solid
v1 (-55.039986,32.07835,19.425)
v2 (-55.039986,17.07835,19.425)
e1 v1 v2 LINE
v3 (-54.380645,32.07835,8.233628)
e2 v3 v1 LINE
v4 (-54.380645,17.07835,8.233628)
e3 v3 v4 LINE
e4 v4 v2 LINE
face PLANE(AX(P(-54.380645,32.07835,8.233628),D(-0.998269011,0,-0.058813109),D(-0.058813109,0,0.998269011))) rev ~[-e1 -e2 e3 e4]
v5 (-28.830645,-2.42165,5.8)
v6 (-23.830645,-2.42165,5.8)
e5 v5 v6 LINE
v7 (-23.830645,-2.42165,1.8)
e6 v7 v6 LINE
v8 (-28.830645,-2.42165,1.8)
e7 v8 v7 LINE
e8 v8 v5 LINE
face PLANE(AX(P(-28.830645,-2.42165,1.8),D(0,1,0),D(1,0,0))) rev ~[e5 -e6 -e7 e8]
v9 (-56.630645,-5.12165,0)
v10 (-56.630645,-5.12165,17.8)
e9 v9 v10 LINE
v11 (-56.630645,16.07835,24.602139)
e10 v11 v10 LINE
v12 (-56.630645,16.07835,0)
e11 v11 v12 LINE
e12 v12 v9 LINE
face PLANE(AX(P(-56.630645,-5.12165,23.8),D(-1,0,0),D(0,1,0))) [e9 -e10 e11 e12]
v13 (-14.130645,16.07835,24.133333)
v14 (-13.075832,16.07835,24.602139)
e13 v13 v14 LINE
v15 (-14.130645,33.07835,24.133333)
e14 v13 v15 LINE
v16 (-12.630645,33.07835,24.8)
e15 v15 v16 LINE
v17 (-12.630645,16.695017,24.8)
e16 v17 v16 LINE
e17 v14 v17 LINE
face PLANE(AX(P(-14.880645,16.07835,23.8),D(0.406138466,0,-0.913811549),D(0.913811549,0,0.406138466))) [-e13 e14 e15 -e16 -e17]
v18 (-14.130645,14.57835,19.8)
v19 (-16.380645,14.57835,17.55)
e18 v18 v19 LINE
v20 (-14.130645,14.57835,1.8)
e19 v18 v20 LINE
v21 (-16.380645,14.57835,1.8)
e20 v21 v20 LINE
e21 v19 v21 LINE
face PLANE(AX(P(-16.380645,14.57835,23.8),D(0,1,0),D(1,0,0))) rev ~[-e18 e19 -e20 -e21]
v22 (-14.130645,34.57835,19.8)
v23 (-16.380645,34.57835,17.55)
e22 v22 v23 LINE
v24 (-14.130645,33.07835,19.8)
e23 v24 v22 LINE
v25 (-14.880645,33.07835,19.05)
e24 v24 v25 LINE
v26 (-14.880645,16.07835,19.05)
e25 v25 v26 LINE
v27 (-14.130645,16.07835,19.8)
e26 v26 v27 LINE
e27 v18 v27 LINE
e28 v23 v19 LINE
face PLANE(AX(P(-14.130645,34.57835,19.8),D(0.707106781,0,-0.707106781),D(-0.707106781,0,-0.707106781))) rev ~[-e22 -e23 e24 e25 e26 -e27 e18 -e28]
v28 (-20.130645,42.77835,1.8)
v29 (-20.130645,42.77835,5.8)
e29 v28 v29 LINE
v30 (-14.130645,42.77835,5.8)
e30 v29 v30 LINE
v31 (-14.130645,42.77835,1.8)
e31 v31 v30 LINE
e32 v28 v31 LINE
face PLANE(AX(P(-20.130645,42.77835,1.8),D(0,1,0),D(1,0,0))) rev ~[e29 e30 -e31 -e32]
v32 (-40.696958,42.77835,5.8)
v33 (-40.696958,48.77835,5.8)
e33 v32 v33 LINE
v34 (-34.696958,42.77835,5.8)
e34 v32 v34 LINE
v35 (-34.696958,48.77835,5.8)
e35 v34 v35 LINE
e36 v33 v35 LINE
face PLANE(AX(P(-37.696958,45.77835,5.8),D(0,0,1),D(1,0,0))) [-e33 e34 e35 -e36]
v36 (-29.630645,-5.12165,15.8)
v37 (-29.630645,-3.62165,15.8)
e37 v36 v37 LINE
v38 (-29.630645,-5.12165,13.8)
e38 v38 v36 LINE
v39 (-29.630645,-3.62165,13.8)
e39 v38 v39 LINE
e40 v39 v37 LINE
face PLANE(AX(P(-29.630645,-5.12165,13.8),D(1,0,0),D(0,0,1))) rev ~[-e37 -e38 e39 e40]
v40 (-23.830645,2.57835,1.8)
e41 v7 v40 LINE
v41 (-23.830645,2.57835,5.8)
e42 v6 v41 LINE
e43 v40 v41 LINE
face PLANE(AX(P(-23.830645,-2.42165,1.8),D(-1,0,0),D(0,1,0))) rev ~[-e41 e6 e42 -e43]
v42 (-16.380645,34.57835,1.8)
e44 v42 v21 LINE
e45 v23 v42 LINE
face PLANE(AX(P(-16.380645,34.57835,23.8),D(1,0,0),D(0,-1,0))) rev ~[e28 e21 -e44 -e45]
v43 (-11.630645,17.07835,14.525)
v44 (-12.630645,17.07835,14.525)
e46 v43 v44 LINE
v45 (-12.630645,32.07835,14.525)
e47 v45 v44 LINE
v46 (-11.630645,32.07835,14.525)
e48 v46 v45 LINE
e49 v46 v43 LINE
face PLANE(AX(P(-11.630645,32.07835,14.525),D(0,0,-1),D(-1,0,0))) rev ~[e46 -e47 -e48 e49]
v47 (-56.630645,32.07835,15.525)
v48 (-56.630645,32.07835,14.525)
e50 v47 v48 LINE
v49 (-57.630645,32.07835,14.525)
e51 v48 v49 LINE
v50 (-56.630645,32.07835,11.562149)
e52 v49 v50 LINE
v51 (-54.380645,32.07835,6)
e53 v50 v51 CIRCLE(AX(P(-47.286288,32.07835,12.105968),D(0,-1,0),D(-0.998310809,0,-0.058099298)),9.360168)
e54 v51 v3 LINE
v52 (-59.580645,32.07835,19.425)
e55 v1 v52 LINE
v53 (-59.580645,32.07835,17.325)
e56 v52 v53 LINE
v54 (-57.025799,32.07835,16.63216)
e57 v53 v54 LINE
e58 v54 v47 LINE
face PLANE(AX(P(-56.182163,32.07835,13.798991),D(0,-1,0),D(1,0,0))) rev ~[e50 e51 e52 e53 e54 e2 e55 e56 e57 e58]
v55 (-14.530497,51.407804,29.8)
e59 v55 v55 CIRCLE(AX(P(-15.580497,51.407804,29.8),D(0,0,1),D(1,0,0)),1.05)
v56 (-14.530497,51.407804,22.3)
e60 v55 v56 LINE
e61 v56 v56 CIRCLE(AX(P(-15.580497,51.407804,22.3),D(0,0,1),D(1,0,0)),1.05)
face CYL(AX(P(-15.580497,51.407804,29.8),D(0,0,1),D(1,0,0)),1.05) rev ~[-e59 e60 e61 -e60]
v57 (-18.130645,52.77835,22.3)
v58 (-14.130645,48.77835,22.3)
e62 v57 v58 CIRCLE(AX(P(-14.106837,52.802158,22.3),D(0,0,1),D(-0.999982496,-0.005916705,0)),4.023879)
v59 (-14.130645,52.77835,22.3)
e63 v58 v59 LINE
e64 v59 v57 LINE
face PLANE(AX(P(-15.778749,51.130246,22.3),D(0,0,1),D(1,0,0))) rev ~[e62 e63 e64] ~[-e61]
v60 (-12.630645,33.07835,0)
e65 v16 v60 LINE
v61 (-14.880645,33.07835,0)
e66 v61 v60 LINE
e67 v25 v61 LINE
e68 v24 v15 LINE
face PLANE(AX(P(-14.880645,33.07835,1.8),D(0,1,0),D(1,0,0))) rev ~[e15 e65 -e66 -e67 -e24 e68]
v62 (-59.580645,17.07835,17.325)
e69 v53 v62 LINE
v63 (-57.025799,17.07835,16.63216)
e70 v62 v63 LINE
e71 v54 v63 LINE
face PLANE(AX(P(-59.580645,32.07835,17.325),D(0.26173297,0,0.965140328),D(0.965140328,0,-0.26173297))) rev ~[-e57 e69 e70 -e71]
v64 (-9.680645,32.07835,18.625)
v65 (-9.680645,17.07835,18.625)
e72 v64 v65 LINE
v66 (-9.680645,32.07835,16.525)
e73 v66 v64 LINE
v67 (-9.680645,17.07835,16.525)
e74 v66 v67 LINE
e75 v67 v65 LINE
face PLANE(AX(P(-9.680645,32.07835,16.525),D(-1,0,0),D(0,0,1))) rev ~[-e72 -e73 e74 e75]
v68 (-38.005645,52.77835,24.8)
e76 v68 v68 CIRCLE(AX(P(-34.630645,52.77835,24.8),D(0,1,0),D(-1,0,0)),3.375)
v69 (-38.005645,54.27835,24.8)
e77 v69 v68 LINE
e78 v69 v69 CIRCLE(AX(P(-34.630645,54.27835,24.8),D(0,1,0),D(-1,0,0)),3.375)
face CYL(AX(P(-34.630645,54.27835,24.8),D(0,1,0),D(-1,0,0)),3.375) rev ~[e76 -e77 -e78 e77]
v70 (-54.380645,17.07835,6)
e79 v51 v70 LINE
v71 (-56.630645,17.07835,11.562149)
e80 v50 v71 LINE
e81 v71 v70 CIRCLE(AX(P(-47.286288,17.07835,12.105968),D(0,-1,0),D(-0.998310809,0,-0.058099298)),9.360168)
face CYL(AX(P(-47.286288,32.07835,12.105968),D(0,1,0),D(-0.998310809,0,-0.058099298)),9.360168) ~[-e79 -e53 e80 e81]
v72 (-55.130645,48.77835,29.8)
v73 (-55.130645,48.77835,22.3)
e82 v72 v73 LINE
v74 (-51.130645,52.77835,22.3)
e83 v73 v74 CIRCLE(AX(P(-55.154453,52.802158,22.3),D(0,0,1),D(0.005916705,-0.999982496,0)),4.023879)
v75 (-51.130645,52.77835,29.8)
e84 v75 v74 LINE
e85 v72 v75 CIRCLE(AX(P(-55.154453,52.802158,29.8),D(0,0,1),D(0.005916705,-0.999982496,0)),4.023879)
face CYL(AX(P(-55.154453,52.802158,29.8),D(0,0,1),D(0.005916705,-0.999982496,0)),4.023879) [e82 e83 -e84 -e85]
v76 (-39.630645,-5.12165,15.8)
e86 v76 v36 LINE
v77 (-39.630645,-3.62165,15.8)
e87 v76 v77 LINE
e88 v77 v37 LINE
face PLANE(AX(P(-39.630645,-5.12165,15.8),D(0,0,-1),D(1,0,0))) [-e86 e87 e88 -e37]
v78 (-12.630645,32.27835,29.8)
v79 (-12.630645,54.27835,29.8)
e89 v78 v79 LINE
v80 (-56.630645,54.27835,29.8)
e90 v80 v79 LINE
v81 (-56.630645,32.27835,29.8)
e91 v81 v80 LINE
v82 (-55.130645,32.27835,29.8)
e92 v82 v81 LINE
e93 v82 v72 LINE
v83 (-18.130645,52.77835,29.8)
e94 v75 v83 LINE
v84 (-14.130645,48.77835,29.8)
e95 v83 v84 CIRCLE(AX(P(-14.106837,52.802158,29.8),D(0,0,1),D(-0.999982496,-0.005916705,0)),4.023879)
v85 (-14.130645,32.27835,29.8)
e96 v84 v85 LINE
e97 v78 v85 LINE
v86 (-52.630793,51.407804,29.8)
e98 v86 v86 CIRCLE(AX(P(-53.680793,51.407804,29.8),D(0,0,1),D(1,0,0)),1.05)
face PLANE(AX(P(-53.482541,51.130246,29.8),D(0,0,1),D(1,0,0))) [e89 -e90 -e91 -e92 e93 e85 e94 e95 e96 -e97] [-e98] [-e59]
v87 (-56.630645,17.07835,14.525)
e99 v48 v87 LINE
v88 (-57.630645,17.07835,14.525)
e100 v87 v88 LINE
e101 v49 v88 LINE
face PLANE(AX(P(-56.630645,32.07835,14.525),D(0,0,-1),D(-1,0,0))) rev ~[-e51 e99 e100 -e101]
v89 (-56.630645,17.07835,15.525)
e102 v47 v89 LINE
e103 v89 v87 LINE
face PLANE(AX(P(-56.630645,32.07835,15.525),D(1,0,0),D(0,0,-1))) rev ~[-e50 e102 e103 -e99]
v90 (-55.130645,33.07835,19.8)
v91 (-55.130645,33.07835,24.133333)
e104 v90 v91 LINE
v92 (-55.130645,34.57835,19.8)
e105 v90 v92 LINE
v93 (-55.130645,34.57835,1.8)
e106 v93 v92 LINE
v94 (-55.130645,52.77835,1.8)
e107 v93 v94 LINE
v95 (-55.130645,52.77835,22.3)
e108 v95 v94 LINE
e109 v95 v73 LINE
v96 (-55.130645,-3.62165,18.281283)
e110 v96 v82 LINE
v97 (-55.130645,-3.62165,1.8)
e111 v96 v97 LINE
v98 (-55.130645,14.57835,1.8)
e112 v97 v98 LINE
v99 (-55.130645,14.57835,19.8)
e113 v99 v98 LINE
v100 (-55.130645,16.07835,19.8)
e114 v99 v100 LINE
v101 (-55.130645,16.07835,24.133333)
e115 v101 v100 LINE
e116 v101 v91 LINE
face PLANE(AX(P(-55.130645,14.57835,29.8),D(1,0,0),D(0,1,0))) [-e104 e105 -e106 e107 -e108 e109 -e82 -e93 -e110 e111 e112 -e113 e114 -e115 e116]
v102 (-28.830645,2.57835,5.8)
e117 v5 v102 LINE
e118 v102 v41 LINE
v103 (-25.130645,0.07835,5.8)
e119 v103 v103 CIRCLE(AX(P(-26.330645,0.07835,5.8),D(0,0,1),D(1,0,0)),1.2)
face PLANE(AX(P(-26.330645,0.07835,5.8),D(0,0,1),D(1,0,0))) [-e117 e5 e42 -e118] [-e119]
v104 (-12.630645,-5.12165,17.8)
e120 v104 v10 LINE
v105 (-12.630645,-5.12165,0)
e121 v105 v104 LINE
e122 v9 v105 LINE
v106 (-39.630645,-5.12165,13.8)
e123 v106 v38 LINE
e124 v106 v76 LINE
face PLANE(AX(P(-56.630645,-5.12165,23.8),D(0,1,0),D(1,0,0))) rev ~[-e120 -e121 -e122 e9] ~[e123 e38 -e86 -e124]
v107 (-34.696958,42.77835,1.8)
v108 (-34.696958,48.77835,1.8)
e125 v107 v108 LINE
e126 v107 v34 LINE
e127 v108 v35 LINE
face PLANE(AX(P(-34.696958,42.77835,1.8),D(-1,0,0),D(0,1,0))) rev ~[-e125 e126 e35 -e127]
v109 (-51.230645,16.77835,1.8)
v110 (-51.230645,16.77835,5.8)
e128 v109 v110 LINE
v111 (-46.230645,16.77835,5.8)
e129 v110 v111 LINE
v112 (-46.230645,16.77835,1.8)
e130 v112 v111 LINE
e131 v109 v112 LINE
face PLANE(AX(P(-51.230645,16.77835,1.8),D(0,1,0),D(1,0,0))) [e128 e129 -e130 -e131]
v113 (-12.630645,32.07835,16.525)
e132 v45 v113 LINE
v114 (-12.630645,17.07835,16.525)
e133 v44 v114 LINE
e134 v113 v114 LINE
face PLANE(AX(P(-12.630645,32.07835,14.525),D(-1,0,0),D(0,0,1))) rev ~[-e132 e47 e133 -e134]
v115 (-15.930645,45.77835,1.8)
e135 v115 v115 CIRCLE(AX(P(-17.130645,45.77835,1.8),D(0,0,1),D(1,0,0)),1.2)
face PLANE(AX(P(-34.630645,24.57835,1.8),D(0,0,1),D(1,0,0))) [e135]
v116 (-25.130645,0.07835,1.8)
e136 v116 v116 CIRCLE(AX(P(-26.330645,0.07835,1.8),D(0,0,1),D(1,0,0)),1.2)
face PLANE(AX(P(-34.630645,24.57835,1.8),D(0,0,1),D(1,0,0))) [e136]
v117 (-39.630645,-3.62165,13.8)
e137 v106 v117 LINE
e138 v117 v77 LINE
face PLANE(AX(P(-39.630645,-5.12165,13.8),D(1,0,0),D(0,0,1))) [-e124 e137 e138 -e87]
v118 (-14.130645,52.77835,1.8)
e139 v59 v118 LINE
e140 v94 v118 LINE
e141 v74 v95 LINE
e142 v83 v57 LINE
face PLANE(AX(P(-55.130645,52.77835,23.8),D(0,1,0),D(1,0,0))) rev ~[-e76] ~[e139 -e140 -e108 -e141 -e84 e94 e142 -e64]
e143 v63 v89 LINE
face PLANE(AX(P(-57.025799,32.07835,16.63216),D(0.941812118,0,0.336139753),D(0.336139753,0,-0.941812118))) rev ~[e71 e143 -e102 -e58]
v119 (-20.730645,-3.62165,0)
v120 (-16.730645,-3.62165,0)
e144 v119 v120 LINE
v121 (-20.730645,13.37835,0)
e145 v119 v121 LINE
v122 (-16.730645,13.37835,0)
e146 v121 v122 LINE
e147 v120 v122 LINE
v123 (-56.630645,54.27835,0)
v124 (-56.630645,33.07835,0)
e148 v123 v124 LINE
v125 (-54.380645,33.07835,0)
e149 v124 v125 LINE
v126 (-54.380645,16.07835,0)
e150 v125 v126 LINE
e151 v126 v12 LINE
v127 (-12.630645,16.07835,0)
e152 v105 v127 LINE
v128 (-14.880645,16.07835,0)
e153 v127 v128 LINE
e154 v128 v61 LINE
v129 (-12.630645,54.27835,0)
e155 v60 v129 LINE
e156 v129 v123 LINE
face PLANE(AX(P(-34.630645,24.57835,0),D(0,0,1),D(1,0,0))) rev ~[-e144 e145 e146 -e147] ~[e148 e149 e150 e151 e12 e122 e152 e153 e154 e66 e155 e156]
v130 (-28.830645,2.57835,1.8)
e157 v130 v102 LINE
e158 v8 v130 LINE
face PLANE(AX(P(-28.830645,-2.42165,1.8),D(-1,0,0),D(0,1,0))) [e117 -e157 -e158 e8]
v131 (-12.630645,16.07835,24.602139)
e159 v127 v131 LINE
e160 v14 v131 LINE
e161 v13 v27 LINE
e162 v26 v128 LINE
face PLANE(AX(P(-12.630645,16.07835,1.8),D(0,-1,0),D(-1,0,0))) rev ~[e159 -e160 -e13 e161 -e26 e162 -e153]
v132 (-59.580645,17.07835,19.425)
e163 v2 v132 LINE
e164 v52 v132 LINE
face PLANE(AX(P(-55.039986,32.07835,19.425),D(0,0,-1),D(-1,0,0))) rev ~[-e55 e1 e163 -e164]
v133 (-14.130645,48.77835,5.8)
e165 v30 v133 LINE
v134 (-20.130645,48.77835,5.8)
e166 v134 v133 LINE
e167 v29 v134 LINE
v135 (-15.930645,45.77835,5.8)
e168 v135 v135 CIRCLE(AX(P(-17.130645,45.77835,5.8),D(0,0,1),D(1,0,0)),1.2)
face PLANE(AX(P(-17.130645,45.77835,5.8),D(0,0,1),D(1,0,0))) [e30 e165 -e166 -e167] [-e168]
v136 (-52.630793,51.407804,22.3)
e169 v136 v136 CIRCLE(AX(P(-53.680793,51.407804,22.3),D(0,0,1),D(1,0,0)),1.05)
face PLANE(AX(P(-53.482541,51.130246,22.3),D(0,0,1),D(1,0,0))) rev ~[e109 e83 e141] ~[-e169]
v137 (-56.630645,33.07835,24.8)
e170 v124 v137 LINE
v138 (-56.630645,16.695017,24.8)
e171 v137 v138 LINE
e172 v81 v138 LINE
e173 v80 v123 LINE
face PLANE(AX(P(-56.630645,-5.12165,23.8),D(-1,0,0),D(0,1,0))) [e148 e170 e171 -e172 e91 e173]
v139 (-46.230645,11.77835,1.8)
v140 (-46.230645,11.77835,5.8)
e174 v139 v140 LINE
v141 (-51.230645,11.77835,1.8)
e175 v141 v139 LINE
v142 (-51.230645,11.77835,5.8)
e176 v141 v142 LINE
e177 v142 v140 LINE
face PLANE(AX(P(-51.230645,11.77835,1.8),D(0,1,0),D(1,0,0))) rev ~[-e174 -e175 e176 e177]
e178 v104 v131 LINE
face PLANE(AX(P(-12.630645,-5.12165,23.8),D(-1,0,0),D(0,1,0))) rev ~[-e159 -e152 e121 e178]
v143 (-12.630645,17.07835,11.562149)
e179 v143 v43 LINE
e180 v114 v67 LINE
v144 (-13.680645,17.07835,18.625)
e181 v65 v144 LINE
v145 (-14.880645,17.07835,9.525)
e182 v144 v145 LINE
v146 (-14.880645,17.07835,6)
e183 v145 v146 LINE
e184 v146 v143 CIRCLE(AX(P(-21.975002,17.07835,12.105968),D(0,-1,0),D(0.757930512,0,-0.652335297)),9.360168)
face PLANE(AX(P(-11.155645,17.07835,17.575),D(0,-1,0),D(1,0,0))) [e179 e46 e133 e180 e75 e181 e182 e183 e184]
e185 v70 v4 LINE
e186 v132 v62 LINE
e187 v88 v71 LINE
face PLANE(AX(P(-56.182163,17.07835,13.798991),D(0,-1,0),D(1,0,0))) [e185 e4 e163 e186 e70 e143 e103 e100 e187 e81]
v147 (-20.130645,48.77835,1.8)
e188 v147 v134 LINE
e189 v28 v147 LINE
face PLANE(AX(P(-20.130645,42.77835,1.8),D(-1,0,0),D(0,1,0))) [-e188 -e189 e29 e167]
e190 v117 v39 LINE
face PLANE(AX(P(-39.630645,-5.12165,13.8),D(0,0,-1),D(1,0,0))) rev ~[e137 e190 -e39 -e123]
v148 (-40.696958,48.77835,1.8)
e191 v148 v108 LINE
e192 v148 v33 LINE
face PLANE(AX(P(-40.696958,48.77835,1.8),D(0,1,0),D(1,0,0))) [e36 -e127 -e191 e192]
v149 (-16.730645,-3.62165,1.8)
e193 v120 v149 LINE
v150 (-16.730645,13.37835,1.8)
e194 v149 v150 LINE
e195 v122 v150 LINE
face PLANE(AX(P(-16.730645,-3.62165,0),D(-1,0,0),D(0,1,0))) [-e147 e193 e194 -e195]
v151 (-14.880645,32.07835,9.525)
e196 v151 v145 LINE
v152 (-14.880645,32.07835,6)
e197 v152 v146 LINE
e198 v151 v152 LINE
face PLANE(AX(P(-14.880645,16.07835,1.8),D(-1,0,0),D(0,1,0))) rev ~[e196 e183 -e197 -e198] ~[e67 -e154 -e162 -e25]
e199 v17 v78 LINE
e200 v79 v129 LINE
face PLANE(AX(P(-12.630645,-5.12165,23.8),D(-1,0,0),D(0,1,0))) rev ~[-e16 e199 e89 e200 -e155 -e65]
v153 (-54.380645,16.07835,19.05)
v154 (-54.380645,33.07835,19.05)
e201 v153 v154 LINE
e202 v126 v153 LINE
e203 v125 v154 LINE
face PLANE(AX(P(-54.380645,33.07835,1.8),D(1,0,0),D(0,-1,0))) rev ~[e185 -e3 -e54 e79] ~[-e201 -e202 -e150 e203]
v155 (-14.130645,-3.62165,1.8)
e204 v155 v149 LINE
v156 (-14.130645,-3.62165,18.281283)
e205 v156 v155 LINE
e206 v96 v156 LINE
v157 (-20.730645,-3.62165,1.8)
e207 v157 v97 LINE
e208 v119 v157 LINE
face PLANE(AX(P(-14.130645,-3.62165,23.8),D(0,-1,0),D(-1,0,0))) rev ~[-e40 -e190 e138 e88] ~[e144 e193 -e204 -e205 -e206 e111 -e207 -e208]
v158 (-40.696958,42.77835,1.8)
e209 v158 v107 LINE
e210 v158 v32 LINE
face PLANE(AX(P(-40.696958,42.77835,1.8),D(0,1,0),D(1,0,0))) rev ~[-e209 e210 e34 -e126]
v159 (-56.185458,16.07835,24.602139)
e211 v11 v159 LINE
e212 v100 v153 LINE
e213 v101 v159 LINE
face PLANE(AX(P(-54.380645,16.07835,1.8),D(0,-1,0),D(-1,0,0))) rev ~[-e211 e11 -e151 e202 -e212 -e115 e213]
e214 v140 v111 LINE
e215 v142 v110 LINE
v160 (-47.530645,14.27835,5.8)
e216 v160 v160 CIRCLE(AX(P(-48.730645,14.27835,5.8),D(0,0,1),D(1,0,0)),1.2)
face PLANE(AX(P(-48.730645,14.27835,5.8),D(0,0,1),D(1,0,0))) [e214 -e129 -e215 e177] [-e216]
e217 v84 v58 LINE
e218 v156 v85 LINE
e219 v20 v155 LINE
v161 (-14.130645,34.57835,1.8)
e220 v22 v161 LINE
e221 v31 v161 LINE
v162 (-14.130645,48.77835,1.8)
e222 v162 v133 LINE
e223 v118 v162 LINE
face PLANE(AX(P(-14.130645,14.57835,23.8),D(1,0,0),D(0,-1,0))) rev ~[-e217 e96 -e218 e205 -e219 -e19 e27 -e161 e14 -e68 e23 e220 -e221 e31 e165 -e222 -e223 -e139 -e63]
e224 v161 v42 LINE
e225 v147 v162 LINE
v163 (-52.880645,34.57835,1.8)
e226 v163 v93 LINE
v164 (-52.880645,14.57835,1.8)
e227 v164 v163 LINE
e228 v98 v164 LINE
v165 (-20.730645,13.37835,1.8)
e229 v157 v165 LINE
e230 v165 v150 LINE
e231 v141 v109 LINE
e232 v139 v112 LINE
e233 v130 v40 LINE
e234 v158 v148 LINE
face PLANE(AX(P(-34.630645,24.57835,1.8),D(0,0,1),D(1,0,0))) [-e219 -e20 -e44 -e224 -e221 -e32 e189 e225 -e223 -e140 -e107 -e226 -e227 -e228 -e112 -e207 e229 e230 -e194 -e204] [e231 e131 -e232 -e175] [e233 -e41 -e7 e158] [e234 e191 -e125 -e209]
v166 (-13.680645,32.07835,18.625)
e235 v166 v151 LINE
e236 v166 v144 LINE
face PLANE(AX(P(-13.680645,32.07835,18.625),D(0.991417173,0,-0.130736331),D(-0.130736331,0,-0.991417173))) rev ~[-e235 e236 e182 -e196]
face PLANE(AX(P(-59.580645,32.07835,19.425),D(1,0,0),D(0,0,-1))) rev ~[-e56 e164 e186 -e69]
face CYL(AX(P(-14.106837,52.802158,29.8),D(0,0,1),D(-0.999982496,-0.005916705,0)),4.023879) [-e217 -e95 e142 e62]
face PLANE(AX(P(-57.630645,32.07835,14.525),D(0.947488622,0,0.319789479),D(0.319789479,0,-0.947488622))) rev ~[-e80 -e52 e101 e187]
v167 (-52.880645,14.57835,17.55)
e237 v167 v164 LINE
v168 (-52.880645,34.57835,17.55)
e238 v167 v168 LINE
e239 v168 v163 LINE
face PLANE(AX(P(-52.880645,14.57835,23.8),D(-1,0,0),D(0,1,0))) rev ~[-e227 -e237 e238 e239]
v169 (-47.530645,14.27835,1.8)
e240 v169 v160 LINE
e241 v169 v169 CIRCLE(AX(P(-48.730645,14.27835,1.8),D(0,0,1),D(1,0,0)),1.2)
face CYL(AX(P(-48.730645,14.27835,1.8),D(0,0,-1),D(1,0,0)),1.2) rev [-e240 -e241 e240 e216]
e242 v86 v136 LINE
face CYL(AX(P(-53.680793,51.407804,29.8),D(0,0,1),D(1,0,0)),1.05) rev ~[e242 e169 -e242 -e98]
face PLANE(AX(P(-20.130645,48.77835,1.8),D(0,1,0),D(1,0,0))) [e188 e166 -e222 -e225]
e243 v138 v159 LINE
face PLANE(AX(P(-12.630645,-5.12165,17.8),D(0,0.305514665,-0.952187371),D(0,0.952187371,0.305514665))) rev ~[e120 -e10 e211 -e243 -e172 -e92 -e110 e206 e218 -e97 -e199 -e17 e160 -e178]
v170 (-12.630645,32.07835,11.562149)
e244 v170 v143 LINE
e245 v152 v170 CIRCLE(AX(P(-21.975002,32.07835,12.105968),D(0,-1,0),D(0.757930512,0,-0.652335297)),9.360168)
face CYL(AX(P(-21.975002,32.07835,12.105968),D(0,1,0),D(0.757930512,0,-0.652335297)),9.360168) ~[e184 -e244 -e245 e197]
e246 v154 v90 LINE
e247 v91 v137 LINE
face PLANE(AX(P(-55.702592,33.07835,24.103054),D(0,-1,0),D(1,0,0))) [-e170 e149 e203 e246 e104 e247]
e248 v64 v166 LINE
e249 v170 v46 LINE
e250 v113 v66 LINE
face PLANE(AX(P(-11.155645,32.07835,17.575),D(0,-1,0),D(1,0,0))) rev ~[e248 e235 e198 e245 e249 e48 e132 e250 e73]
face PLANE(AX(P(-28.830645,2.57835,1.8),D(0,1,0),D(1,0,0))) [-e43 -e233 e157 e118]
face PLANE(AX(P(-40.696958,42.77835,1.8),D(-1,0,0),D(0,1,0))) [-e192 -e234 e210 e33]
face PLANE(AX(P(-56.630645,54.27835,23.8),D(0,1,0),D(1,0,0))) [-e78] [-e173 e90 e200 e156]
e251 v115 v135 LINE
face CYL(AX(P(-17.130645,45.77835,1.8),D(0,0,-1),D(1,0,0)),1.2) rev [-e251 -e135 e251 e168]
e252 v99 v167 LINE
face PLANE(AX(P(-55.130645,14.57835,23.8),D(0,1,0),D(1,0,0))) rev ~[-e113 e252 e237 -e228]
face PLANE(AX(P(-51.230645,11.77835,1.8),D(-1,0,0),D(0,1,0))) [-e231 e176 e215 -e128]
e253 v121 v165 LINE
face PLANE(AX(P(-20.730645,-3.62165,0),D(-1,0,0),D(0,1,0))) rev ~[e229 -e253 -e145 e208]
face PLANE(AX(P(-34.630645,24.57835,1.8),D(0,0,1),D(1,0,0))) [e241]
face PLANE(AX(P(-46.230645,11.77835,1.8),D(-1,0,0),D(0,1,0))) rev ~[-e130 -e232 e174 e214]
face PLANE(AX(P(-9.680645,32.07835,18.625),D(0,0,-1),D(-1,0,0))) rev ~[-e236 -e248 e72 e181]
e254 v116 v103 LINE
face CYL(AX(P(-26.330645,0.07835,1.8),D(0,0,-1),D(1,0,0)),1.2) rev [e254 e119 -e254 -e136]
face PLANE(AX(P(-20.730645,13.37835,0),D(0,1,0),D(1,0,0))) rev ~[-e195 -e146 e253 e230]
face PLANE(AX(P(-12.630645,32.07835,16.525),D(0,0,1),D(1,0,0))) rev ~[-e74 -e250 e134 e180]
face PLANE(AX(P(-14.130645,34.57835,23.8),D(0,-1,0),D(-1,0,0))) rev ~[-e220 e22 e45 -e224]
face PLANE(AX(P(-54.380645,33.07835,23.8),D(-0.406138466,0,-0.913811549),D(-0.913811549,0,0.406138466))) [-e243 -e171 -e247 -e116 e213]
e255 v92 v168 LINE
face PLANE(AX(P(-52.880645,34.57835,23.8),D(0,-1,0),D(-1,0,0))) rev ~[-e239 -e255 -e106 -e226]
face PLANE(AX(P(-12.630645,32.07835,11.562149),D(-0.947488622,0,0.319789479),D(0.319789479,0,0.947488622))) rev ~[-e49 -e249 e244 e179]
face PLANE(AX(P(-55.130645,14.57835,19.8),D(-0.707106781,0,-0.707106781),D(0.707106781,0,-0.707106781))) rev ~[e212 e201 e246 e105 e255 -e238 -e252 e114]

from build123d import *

# Parameters (mm, degrees)
F0_W      = 4
F0_H      = 17
F1_DEPTH  = 1.8
F3_DEPTH  = 22
F4_W      = 44
F4_H      = 59.4
F5_DEPTH  = 6
F6_W      = 2.25
F6_H      = 20
F7_DEPTH  = 10
F9_DEPTH  = 20
F11_DEPTH = 17
F13_DEPTH = 20
F15_DEPTH = 17
F17_DEPTH = 45
F18_R     = 3.375
F19_DEPTH = 3
F20_R     = 1.05
F21_DEPTH = 7.5
F22_W     = 10
F22_H     = 2
F23_DEPTH = 2.5
F25_START = 1
F24_W     = 2.95
F24_H     = 2.1
F25_DEPTH = 15
F26_W     = 5
F26_H     = 5
F26_R     = 1.2
F26_W_2   = 6
F26_H_2   = 6
F27_DEPTH = 4


# Not quite as in the source:
# - a feature names something its author has since deleted; it is built from what else it names


with BuildPart() as f1:
    # F0 (on Top) → F1 (new body)
    with BuildSketch(Plane.XY):
        Polygon((-12.630645159, 54.2783500865), (-56.630645159, 54.2783500865), (-56.630645159, 33.0783500865), (-54.380645159, 33.0783500865), (-54.380645159, 16.0783500865), (-56.630645159, 16.0783500865), (-56.630645159, -5.1216499135), (-12.630645159, -5.1216499135), (-12.630645159, 16.0783500865), (-14.880645159, 16.0783500865), (-14.880645159, 33.0783500865), (-12.630645159, 33.0783500865), align=None)
        with Locations((-18.730645159, 4.8783500865)):
            Rectangle(F0_W, F0_H, mode=Mode.SUBTRACT)
    extrude(amount=F1_DEPTH)

    # F2 (on face) → F3 (join)
    with BuildSketch(Plane.XY.offset(1.8)):
        Polygon((-12.630645159, 33.0783500865), (-12.630645159, 54.2783500865), (-56.630645159, 54.2783500865), (-56.630645159, 33.0783500865), (-54.380645159, 33.0783500865), (-54.380645159, 16.0783500865), (-56.630645159, 16.0783500865), (-56.630645159, -5.1216499135), (-12.630645159, -5.1216499135), (-12.630645159, 16.0783500865), (-14.880645159, 16.0783500865), (-14.880645159, 33.0783500865), align=None)
        Polygon((-55.130645159, 34.5783500865), (-55.130645159, 52.7783500865), (-14.130645159, 52.7783500865), (-14.130645159, 34.5783500865), (-16.380645159, 34.5783500865), (-16.380645159, 14.5783500865), (-14.130645159, 14.5783500865), (-14.130645159, -3.6216499135), (-16.730645159, -3.6216499135), (-20.730645159, -3.6216499135), (-55.130645159, -3.6216499135), (-55.130645159, 14.5783500865), (-52.880645159, 14.5783500865), (-52.880645159, 34.5783500865), align=None, mode=Mode.SUBTRACT)
    extrude(amount=F3_DEPTH)

    # F4 (on face) → F5 (join)
    with BuildSketch(Plane.XY.offset(23.8)):
        with Locations((-34.630645159, 24.5783500865)):
            Rectangle(F4_W, F4_H)
        Polygon((-55.130645159, 34.5783500865), (-55.130645159, 52.7783500865), (-14.130645159, 52.7783500865), (-14.130645159, 34.5783500865), (-16.380645159, 34.5783500865), (-16.380645159, 14.5783500865), (-14.130645159, 14.5783500865), (-14.130645159, -3.6216499135), (-55.130645159, -3.6216499135), (-55.130645159, 14.5783500865), (-52.880645159, 14.5783500865), (-52.880645159, 34.5783500865), align=None, mode=Mode.SUBTRACT)
    extrude(amount=F5_DEPTH)

    # F6 (on face) → F7 (cut)
    with BuildSketch(Plane.XY.offset(29.8)):
        with Locations((-54.005645159, 24.5783500865)):
            Rectangle(F6_W, F6_H)
        with Locations((-15.255645159, 24.5783500865)):
            Rectangle(F6_W, F6_H)
    extrude(amount=-F7_DEPTH, mode=Mode.SUBTRACT)

    # F8 (on face) → F9 (cut)
    with BuildSketch(Plane.XZ.offset(-14.5783500865)):
        Polygon((-52.880645159, 19.8), (-55.130645159, 19.8), (-52.880645159, 17.55), align=None)
    extrude(amount=-F9_DEPTH, mode=Mode.SUBTRACT)

    # F10 (on face) → F11 (cut)
    with BuildSketch(Plane.XZ.offset(-33.0783500865)):
        Polygon((-56.630645159, 24.8), (-56.630645159, 23.8), (-55.880645159, 23.8), (-54.380645159, 23.8), align=None)
    extrude(amount=F11_DEPTH, mode=Mode.SUBTRACT)

    # F12 (on face) → F13 (cut)
    with BuildSketch(Plane(origin=(0, 34.5783500865, 0), x_dir=(-1, 0, 0), z_dir=(0, 1, 0))):
        Polygon((16.380645159, 17.55), (16.380645159, 19.8), (14.130645159, 19.8), align=None)
    extrude(amount=-F13_DEPTH, mode=Mode.SUBTRACT)

    # F14 (on face) → F15 (cut)
    with BuildSketch(Plane(origin=(0, 16.0783500865, 0), x_dir=(-1, 0, 0), z_dir=(0, 1, 0))):
        Polygon((12.630645159, 24.8), (12.630645159, 23.8), (14.880645159, 23.8), align=None)
    extrude(amount=F15_DEPTH, mode=Mode.SUBTRACT)

    # F16 (on face) → F17 (cut)
    with BuildSketch(Plane.YZ.offset(-12.630645159)):
        Polygon((32.2783500865, 29.8), (-5.1216499135, 29.8), (-5.1216499135, 17.8), align=None)
    extrude(amount=-F17_DEPTH, mode=Mode.SUBTRACT)

    # F18 (on face) → F19 (cut)
    with BuildSketch(Plane(origin=(0, 54.2783500865, 0), x_dir=(-1, 0, 0), z_dir=(0, 1, 0))):
        with Locations((34.630645159, 24.8)):
            Circle(F18_R)
    extrude(amount=-F19_DEPTH, mode=Mode.SUBTRACT)

    # F20 (on face) → F21 (join)
    with BuildSketch(Plane.XY.offset(29.8)):
        with BuildLine():
            Line((-55.130645159, 52.7783500865), (-55.130645159, 48.7783500865))
            ThreePointArc((-55.130645159, 48.7783500865), (-52.3091414621, 49.9568463896), (-51.130645159, 52.7783500865))
            Line((-51.130645159, 52.7783500865), (-55.130645159, 52.7783500865))
        make_face()
        with Locations((-53.6807930499, 51.4078039413)):
            Circle(F20_R, mode=Mode.SUBTRACT)
        with BuildLine():
            Line((-14.130645159, 52.7783500865), (-18.130645159, 52.7783500865))
            ThreePointArc((-18.130645159, 52.7783500865), (-16.952148856, 49.9568463896), (-14.130645159, 48.7783500865))
            Line((-14.130645159, 48.7783500865), (-14.130645159, 52.7783500865))
        make_face()
        with Locations((-15.5804972681, 51.4078039413)):
            Circle(F20_R, mode=Mode.SUBTRACT)
    extrude(amount=-F21_DEPTH)

    # F22 (on face) → F23 (cut)
    with BuildSketch(Plane.XZ.offset(5.1216499135)):
        with Locations((-34.630645159, 14.8)):
            Rectangle(F22_W, F22_H)
    extrude(amount=-F23_DEPTH, mode=Mode.SUBTRACT)

    # F24 (on face) → F25 (join)
    with BuildSketch(Plane.XZ.offset(-33.0783500865).offset(F25_START)):
        with Locations((-11.155645159, 17.575)):
            Rectangle(F24_W, F24_H)
        with BuildLine():
            Line((-14.880645159, 9.525), (-14.880645159, 6))
            ThreePointArc((-14.880645159, 6), (-13.2978940887, 8.5959050075), (-12.630645159, 11.5621488653))
            Line((-12.630645159, 11.5621488653), (-12.630645159, 14.525))
            Line((-12.630645159, 14.525), (-12.630645159, 16.525))
            Line((-12.630645159, 16.525), (-12.630645159, 18.625))
            Line((-12.630645159, 18.625), (-13.680645159, 18.625))
            Line((-13.680645159, 18.625), (-14.880645159, 9.525))
        make_face()
        Polygon((-12.630645159, 14.525), (-12.630645159, 11.5621488653), (-11.630645159, 14.525), align=None)
        with BuildLine():
            Line((-57.630645159, 14.525), (-56.630645159, 11.5621488653))
            ThreePointArc((-56.630645159, 11.5621488653), (-55.9633962294, 8.5959050075), (-54.380645159, 6))
            Line((-54.380645159, 6), (-54.380645159, 8.2336284751))
            Line((-54.380645159, 8.2336284751), (-55.0399858184, 19.425))
            Line((-55.0399858184, 19.425), (-59.580645159, 19.425))
            Line((-59.580645159, 19.425), (-59.580645159, 17.325))
            Line((-59.580645159, 17.325), (-57.0257989239, 16.632160343))
            Line((-57.0257989239, 16.632160343), (-56.630645159, 15.525))
            Line((-56.630645159, 15.525), (-56.630645159, 14.525))
            Line((-56.630645159, 14.525), (-57.630645159, 14.525))
        make_face()
    extrude(amount=F25_DEPTH)

    # F26 (on face) → F27 (join)
    with BuildSketch(Plane.XY.offset(1.8)):
        with Locations((-48.730645159, 14.2783500865)):
            Rectangle(F26_W, F26_H)
        with Locations((-48.730645159, 14.2783500865)):
            Circle(F26_R, mode=Mode.SUBTRACT)
        with Locations((-26.330645159, 0.0783500865)):
            Rectangle(F26_W, F26_H)
        with Locations((-26.330645159, 0.0783500865)):
            Circle(F26_R, mode=Mode.SUBTRACT)
        with Locations((-17.130645159, 45.7783500865)):
            Rectangle(F26_W_2, F26_H_2)
        with Locations((-17.130645159, 45.7783500865)):
            Circle(F26_R, mode=Mode.SUBTRACT)
        with Locations((-37.6969575882, 45.7783500865)):
            Rectangle(F26_W_2, F26_H_2)
    extrude(amount=F27_DEPTH)


solid = f1.part
